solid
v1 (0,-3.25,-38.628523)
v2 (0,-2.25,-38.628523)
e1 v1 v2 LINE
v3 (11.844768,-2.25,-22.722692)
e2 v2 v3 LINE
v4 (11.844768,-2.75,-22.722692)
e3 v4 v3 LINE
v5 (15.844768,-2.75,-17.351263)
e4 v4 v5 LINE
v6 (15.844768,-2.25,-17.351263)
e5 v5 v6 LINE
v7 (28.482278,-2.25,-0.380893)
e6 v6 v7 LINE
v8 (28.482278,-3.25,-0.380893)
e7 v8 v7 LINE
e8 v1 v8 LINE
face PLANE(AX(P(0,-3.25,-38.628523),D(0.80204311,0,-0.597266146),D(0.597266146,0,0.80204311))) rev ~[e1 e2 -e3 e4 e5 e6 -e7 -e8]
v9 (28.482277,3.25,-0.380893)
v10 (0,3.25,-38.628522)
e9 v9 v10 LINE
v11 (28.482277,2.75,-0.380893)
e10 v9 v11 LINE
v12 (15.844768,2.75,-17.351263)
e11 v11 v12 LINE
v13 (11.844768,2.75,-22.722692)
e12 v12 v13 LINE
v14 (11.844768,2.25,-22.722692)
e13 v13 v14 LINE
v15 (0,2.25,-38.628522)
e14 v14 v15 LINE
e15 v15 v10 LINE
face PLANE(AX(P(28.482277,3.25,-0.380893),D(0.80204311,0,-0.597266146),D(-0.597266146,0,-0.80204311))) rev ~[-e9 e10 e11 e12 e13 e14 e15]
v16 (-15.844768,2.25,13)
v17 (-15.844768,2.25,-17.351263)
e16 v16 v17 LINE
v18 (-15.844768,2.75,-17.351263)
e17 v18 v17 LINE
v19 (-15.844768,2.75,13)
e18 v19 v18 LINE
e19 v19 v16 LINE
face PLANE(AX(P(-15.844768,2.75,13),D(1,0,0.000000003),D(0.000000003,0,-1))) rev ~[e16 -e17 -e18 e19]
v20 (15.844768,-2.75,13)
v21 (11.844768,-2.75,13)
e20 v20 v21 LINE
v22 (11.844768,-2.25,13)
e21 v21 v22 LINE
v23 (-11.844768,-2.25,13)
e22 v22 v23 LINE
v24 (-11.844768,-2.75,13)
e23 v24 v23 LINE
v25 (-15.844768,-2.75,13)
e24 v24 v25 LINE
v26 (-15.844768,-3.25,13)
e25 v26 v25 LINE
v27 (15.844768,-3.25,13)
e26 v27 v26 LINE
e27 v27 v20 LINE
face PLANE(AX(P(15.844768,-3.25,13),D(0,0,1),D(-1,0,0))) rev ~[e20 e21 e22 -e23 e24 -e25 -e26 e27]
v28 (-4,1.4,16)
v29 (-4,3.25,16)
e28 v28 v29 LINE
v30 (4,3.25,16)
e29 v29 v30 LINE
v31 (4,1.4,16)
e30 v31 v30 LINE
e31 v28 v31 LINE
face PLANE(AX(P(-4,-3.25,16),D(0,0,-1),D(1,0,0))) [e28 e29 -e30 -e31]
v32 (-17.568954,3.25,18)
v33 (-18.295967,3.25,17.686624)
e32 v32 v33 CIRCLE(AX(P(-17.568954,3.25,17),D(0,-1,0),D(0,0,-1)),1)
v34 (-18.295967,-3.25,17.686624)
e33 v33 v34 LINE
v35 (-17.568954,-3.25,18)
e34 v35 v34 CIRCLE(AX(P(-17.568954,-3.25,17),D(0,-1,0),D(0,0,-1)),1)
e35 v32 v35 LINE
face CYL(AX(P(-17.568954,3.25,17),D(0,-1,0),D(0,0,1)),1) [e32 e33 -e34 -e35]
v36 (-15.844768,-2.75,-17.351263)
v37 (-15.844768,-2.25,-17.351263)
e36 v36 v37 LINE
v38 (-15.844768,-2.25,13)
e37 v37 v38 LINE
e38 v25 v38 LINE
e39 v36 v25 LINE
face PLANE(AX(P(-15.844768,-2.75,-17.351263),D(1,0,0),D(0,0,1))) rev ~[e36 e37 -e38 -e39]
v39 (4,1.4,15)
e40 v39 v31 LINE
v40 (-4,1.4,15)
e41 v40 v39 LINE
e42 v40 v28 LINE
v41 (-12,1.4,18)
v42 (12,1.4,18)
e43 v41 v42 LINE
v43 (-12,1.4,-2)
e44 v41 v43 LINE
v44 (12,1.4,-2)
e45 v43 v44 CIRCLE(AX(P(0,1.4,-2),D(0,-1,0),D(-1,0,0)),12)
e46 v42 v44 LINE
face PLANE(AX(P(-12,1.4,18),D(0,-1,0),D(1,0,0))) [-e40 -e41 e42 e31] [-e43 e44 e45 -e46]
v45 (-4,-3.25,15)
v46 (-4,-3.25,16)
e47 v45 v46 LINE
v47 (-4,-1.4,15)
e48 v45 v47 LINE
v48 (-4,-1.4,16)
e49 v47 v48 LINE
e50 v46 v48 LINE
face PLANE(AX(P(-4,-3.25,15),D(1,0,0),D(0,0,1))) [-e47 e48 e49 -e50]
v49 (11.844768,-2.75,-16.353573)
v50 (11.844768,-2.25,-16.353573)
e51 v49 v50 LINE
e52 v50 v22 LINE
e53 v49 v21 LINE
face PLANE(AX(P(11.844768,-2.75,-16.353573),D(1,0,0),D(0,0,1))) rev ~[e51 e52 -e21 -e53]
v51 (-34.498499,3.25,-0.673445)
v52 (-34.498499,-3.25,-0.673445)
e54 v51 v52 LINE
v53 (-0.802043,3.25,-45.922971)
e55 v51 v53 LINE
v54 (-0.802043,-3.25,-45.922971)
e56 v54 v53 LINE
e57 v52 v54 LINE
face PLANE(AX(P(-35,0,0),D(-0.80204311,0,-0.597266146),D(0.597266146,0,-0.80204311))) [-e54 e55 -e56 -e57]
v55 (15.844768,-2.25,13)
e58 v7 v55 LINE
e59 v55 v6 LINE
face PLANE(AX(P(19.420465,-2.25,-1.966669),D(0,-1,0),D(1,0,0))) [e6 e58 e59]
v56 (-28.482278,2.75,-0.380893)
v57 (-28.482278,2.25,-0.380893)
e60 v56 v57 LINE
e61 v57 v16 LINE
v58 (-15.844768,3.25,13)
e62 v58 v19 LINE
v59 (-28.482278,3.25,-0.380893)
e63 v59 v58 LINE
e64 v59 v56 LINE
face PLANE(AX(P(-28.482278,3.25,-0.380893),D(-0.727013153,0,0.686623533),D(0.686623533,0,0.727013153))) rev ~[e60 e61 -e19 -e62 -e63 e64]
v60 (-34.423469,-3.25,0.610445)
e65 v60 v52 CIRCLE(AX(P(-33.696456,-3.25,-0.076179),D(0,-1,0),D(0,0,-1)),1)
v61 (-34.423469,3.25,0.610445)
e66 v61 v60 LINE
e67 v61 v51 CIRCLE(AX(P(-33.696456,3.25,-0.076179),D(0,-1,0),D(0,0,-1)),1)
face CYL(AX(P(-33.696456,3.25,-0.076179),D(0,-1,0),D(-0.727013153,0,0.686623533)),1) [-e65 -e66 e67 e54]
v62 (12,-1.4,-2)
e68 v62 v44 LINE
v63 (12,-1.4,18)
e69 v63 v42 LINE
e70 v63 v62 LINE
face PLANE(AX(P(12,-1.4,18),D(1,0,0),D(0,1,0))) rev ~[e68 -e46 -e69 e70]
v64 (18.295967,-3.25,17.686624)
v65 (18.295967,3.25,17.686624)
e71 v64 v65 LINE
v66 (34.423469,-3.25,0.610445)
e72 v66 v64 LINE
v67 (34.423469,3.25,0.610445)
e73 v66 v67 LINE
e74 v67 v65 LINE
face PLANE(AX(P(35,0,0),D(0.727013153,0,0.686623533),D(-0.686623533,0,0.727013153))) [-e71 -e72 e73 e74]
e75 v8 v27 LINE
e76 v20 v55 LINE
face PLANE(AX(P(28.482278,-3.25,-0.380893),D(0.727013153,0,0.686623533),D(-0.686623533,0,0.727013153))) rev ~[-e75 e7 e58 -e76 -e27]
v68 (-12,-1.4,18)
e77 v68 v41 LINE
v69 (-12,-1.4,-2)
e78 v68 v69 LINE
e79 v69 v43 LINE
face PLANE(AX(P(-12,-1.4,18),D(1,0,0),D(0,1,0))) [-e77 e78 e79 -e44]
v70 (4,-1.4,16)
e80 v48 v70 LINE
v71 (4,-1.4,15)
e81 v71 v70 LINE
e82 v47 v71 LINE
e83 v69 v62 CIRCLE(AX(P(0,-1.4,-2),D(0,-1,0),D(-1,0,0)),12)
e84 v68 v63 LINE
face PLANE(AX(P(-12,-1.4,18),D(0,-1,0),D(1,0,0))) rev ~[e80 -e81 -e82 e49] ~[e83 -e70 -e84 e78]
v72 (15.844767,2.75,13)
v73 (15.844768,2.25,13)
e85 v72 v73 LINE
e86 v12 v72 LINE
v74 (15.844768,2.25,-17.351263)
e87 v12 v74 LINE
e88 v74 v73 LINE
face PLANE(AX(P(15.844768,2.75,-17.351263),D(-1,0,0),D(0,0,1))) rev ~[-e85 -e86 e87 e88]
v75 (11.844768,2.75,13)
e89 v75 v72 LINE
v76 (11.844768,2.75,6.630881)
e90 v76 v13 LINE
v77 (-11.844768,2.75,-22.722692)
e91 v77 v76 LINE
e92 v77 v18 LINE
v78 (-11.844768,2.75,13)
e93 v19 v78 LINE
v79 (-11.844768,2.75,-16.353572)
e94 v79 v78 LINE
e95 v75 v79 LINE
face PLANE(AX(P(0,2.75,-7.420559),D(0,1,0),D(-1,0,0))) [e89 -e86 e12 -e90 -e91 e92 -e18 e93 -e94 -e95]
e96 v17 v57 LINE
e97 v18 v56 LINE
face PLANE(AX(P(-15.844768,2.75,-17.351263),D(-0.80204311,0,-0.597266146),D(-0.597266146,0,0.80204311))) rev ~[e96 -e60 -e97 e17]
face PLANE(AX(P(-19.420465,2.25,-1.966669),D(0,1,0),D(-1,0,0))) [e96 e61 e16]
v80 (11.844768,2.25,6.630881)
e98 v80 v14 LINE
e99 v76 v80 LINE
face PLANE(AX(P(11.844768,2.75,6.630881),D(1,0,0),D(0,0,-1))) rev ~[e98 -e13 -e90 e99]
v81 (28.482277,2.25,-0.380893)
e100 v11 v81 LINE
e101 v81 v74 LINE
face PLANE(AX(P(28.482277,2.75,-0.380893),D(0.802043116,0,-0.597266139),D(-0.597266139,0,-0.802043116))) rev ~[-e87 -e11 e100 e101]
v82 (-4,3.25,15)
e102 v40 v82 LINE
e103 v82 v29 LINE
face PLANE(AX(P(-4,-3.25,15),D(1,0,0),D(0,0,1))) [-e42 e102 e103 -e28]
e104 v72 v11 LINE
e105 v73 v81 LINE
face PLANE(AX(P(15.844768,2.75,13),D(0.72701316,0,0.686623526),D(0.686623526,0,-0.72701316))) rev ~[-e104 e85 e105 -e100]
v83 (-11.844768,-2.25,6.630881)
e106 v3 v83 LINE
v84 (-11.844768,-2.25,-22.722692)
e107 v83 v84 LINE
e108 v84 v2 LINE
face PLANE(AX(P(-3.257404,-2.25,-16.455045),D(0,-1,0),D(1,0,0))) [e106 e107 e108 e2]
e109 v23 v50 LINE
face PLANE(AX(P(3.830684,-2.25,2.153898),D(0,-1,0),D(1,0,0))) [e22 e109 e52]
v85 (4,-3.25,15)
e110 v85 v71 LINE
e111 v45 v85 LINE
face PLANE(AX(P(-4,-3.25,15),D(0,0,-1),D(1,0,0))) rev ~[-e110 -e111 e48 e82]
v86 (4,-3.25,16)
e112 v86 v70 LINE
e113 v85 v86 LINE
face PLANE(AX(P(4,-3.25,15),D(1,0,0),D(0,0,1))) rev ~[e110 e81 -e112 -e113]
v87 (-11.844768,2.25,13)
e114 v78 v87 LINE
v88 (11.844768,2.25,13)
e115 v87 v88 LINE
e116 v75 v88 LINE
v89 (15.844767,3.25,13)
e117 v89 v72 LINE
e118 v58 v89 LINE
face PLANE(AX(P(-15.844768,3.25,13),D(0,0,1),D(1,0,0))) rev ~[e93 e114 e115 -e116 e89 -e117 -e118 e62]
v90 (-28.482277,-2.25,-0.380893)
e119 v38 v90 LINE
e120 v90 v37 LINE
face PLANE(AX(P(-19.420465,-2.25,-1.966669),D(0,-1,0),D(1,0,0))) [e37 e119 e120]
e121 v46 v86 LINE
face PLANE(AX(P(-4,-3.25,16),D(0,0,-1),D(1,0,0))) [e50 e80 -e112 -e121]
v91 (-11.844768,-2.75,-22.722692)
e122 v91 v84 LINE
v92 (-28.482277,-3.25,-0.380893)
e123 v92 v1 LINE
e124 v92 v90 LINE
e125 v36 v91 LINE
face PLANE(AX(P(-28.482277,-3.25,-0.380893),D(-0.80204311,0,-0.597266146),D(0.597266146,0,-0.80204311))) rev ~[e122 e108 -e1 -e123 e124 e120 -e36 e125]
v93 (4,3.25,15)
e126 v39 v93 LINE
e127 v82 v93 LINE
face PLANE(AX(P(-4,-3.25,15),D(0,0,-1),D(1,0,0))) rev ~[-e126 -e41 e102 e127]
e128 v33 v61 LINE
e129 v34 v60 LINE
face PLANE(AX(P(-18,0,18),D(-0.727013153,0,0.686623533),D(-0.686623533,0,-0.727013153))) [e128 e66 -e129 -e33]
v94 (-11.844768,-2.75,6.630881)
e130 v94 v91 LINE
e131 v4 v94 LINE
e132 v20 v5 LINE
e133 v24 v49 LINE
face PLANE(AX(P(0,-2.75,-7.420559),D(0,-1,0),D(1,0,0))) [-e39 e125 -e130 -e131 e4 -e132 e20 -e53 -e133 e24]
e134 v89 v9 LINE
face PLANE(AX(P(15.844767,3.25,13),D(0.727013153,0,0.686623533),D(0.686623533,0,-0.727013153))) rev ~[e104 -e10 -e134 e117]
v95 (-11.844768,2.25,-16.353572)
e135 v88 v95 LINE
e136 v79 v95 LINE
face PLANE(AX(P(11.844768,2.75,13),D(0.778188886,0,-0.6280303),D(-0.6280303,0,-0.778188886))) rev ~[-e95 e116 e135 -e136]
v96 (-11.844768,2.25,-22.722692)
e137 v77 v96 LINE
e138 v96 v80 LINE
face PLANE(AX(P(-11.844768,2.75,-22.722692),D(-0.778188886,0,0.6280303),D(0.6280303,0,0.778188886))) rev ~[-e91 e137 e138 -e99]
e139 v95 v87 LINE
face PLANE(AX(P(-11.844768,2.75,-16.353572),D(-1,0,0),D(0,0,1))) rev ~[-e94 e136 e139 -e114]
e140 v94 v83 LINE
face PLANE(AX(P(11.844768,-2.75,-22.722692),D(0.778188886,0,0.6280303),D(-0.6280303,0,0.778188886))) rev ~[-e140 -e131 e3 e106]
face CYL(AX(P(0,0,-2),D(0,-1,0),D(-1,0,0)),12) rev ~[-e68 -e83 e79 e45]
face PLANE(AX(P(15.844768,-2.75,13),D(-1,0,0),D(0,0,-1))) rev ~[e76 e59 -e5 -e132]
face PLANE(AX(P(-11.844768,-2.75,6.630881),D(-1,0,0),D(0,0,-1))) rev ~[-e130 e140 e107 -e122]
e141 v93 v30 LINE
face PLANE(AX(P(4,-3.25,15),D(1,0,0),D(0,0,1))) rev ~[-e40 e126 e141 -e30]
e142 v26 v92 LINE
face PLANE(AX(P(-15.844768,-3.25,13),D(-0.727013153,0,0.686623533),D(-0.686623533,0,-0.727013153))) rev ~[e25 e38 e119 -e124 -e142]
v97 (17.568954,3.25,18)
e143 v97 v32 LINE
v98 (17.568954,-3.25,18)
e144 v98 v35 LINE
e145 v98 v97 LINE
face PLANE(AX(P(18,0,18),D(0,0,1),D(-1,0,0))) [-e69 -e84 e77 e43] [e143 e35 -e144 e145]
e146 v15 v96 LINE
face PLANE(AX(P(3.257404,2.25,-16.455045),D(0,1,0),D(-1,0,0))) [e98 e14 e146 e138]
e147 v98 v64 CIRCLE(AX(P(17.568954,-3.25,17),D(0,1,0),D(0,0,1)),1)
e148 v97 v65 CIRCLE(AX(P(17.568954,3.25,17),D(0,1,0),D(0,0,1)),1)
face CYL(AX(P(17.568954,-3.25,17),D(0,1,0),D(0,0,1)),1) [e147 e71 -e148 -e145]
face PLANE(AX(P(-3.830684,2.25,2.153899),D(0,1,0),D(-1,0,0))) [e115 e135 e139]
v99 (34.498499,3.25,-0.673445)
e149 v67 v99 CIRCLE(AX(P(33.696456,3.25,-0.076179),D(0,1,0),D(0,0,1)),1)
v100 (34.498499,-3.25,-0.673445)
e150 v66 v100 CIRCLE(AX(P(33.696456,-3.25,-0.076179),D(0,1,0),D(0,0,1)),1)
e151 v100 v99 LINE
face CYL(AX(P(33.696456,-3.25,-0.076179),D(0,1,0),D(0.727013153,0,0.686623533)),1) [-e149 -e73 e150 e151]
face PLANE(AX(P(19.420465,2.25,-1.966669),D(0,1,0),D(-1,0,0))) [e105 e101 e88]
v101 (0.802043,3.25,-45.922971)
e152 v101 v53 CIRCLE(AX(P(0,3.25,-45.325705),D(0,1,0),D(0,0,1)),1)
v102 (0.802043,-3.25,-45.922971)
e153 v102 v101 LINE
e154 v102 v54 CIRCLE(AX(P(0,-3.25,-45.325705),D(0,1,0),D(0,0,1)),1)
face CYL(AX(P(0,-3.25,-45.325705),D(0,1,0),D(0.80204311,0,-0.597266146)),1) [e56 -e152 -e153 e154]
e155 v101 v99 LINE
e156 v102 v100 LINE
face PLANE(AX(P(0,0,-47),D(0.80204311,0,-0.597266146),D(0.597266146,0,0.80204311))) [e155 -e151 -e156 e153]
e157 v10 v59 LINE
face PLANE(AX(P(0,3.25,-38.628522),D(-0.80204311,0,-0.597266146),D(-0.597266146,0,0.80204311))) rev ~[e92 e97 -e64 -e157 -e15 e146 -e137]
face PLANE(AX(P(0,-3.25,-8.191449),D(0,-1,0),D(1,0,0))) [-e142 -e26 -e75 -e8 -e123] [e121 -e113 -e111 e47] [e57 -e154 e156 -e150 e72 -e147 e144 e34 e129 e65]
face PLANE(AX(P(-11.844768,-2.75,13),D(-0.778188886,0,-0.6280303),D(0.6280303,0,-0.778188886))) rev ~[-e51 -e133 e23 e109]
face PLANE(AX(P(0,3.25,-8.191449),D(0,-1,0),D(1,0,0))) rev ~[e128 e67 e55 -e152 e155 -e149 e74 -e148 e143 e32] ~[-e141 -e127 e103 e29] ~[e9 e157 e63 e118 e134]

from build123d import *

# Parameters (mm, degrees)
F1_DEPTH  = 3.25
F3_DEPTH  = 0.5
F5_DEPTH  = 0.5
F7_DEPTH  = 0.5
F9_DEPTH  = 0.5
F10_W     = 24
F10_H     = 2.8
F11_DEPTH = 20
F13_DEPTH = 1.4
F14_W     = 8
F14_H     = 1
F15_DEPTH = 25
F16_R     = 1


# Not quite as in the source:
# - ends of sketch curves that miss each other by under 0.0002 mm in the source are joined


with BuildPart() as f1:
    # F0 (on Front) → F1 (new body, symmetric)
    with BuildSketch(Plane.XZ):
        Polygon((18, 18), (0, 18), (-18, 18), (-35, 0), (0, -47), (35, 0), align=None)
    extrude(amount=F1_DEPTH, both=True)

    # F2 (on face) → F3 (cut)
    with BuildSketch(Plane.XZ.offset(3.25)):
        Polygon((15.8447675538, 13), (-15.8447675538, 13), (-28.4822773709, -0.3808927475), (1.162e-07, -38.628522516), (28.4822775009, -0.3808928851), align=None)
    extrude(amount=-F3_DEPTH, mode=Mode.SUBTRACT)

    # F4 (on face) → F5 (cut)
    with BuildSketch(Plane(origin=(0, 3.25, 0), x_dir=(-1, 0, 0), z_dir=(0, 1, 0))):
        Polygon((28.482277527, -0.3808925379), (15.8447676545, 13.0000002682), (-15.8447670441, 13.0000002682), (-28.4822772579, -0.3808928993), (0, -38.6285223599), align=None)
    extrude(amount=-F5_DEPTH, mode=Mode.SUBTRACT)

    # F6 (on face) → F7 (cut)
    with BuildSketch(Plane.XZ.offset(2.75)):
        Polygon((-15.8447675538, -17.3512630734), (-15.8447675538, 13), (-28.4822773709, -0.3808927475), align=None)
        Polygon((28.4822775009, -0.3808928851), (15.8447675538, 13), (15.8447675538, -17.3512633855), align=None)
        Polygon((11.8447675538, -22.7226919569), (-11.8447675538, 6.6308805462), (-11.8447675538, -22.7226916448), (1.162e-07, -38.628522516), align=None)
        Polygon((11.8447675538, -16.3535725031), (11.8447675538, 13), (-11.8447675538, 13), align=None)
    extrude(amount=-F7_DEPTH, mode=Mode.SUBTRACT)

    # F8 (on face) → F9 (cut)
    with BuildSketch(Plane(origin=(0, 2.75, 0), x_dir=(-1, 0, 0), z_dir=(0, 1, 0))):
        Polygon((-15.8447675538, -17.3512633855), (-15.8447675538, 13), (-28.4822772579, -0.3808928993), align=None)
        Polygon((28.482277527, -0.3808925379), (15.8447676545, 13.0000002682), (15.8447675538, -17.3512630734), align=None)
        Polygon((11.8447675538, -16.353572196), (11.8447675538, 13.0000002682), (-11.8447675538, 13.0000002682), align=None)
        Polygon((0, -38.6285223599), (11.8447675538, -22.7226916448), (-11.8447675538, 6.6308808195), (-11.8447675538, -22.7226916448), align=None)
    extrude(amount=-F9_DEPTH, mode=Mode.SUBTRACT)

    # F10 (on face) → F11 (cut)
    with BuildSketch(Plane.XY.offset(18)):
        Rectangle(F10_W, F10_H)
    extrude(amount=-F11_DEPTH, mode=Mode.SUBTRACT)

    # F12 (on Front) → F13 (cut, symmetric)
    with BuildSketch(Plane.XZ):
        with BuildLine():
            Line((12, -2), (-12, -2))
            ThreePointArc((-12, -2), (0, -14), (12, -2))
        make_face()
    extrude(amount=F13_DEPTH, both=True, mode=Mode.SUBTRACT)

    # F14 (on face) → F15 (cut)
    with BuildSketch(Plane.XZ.offset(3.25)):
        with Locations((0, 15.5)):
            Rectangle(F14_W, F14_H)
    extrude(amount=-F15_DEPTH, mode=Mode.SUBTRACT)

    # F16
    f16_edges = [f1.edges().sort_by_distance(p)[0] for p in [
        (0, 0, -47),
        (35, 0, 0),
        (-35, 0, 0),
        (-18, 0, 18),
        (18, 0, 18),
    ]]
    fillet(f16_edges, radius=F16_R)


solid = f1.part
